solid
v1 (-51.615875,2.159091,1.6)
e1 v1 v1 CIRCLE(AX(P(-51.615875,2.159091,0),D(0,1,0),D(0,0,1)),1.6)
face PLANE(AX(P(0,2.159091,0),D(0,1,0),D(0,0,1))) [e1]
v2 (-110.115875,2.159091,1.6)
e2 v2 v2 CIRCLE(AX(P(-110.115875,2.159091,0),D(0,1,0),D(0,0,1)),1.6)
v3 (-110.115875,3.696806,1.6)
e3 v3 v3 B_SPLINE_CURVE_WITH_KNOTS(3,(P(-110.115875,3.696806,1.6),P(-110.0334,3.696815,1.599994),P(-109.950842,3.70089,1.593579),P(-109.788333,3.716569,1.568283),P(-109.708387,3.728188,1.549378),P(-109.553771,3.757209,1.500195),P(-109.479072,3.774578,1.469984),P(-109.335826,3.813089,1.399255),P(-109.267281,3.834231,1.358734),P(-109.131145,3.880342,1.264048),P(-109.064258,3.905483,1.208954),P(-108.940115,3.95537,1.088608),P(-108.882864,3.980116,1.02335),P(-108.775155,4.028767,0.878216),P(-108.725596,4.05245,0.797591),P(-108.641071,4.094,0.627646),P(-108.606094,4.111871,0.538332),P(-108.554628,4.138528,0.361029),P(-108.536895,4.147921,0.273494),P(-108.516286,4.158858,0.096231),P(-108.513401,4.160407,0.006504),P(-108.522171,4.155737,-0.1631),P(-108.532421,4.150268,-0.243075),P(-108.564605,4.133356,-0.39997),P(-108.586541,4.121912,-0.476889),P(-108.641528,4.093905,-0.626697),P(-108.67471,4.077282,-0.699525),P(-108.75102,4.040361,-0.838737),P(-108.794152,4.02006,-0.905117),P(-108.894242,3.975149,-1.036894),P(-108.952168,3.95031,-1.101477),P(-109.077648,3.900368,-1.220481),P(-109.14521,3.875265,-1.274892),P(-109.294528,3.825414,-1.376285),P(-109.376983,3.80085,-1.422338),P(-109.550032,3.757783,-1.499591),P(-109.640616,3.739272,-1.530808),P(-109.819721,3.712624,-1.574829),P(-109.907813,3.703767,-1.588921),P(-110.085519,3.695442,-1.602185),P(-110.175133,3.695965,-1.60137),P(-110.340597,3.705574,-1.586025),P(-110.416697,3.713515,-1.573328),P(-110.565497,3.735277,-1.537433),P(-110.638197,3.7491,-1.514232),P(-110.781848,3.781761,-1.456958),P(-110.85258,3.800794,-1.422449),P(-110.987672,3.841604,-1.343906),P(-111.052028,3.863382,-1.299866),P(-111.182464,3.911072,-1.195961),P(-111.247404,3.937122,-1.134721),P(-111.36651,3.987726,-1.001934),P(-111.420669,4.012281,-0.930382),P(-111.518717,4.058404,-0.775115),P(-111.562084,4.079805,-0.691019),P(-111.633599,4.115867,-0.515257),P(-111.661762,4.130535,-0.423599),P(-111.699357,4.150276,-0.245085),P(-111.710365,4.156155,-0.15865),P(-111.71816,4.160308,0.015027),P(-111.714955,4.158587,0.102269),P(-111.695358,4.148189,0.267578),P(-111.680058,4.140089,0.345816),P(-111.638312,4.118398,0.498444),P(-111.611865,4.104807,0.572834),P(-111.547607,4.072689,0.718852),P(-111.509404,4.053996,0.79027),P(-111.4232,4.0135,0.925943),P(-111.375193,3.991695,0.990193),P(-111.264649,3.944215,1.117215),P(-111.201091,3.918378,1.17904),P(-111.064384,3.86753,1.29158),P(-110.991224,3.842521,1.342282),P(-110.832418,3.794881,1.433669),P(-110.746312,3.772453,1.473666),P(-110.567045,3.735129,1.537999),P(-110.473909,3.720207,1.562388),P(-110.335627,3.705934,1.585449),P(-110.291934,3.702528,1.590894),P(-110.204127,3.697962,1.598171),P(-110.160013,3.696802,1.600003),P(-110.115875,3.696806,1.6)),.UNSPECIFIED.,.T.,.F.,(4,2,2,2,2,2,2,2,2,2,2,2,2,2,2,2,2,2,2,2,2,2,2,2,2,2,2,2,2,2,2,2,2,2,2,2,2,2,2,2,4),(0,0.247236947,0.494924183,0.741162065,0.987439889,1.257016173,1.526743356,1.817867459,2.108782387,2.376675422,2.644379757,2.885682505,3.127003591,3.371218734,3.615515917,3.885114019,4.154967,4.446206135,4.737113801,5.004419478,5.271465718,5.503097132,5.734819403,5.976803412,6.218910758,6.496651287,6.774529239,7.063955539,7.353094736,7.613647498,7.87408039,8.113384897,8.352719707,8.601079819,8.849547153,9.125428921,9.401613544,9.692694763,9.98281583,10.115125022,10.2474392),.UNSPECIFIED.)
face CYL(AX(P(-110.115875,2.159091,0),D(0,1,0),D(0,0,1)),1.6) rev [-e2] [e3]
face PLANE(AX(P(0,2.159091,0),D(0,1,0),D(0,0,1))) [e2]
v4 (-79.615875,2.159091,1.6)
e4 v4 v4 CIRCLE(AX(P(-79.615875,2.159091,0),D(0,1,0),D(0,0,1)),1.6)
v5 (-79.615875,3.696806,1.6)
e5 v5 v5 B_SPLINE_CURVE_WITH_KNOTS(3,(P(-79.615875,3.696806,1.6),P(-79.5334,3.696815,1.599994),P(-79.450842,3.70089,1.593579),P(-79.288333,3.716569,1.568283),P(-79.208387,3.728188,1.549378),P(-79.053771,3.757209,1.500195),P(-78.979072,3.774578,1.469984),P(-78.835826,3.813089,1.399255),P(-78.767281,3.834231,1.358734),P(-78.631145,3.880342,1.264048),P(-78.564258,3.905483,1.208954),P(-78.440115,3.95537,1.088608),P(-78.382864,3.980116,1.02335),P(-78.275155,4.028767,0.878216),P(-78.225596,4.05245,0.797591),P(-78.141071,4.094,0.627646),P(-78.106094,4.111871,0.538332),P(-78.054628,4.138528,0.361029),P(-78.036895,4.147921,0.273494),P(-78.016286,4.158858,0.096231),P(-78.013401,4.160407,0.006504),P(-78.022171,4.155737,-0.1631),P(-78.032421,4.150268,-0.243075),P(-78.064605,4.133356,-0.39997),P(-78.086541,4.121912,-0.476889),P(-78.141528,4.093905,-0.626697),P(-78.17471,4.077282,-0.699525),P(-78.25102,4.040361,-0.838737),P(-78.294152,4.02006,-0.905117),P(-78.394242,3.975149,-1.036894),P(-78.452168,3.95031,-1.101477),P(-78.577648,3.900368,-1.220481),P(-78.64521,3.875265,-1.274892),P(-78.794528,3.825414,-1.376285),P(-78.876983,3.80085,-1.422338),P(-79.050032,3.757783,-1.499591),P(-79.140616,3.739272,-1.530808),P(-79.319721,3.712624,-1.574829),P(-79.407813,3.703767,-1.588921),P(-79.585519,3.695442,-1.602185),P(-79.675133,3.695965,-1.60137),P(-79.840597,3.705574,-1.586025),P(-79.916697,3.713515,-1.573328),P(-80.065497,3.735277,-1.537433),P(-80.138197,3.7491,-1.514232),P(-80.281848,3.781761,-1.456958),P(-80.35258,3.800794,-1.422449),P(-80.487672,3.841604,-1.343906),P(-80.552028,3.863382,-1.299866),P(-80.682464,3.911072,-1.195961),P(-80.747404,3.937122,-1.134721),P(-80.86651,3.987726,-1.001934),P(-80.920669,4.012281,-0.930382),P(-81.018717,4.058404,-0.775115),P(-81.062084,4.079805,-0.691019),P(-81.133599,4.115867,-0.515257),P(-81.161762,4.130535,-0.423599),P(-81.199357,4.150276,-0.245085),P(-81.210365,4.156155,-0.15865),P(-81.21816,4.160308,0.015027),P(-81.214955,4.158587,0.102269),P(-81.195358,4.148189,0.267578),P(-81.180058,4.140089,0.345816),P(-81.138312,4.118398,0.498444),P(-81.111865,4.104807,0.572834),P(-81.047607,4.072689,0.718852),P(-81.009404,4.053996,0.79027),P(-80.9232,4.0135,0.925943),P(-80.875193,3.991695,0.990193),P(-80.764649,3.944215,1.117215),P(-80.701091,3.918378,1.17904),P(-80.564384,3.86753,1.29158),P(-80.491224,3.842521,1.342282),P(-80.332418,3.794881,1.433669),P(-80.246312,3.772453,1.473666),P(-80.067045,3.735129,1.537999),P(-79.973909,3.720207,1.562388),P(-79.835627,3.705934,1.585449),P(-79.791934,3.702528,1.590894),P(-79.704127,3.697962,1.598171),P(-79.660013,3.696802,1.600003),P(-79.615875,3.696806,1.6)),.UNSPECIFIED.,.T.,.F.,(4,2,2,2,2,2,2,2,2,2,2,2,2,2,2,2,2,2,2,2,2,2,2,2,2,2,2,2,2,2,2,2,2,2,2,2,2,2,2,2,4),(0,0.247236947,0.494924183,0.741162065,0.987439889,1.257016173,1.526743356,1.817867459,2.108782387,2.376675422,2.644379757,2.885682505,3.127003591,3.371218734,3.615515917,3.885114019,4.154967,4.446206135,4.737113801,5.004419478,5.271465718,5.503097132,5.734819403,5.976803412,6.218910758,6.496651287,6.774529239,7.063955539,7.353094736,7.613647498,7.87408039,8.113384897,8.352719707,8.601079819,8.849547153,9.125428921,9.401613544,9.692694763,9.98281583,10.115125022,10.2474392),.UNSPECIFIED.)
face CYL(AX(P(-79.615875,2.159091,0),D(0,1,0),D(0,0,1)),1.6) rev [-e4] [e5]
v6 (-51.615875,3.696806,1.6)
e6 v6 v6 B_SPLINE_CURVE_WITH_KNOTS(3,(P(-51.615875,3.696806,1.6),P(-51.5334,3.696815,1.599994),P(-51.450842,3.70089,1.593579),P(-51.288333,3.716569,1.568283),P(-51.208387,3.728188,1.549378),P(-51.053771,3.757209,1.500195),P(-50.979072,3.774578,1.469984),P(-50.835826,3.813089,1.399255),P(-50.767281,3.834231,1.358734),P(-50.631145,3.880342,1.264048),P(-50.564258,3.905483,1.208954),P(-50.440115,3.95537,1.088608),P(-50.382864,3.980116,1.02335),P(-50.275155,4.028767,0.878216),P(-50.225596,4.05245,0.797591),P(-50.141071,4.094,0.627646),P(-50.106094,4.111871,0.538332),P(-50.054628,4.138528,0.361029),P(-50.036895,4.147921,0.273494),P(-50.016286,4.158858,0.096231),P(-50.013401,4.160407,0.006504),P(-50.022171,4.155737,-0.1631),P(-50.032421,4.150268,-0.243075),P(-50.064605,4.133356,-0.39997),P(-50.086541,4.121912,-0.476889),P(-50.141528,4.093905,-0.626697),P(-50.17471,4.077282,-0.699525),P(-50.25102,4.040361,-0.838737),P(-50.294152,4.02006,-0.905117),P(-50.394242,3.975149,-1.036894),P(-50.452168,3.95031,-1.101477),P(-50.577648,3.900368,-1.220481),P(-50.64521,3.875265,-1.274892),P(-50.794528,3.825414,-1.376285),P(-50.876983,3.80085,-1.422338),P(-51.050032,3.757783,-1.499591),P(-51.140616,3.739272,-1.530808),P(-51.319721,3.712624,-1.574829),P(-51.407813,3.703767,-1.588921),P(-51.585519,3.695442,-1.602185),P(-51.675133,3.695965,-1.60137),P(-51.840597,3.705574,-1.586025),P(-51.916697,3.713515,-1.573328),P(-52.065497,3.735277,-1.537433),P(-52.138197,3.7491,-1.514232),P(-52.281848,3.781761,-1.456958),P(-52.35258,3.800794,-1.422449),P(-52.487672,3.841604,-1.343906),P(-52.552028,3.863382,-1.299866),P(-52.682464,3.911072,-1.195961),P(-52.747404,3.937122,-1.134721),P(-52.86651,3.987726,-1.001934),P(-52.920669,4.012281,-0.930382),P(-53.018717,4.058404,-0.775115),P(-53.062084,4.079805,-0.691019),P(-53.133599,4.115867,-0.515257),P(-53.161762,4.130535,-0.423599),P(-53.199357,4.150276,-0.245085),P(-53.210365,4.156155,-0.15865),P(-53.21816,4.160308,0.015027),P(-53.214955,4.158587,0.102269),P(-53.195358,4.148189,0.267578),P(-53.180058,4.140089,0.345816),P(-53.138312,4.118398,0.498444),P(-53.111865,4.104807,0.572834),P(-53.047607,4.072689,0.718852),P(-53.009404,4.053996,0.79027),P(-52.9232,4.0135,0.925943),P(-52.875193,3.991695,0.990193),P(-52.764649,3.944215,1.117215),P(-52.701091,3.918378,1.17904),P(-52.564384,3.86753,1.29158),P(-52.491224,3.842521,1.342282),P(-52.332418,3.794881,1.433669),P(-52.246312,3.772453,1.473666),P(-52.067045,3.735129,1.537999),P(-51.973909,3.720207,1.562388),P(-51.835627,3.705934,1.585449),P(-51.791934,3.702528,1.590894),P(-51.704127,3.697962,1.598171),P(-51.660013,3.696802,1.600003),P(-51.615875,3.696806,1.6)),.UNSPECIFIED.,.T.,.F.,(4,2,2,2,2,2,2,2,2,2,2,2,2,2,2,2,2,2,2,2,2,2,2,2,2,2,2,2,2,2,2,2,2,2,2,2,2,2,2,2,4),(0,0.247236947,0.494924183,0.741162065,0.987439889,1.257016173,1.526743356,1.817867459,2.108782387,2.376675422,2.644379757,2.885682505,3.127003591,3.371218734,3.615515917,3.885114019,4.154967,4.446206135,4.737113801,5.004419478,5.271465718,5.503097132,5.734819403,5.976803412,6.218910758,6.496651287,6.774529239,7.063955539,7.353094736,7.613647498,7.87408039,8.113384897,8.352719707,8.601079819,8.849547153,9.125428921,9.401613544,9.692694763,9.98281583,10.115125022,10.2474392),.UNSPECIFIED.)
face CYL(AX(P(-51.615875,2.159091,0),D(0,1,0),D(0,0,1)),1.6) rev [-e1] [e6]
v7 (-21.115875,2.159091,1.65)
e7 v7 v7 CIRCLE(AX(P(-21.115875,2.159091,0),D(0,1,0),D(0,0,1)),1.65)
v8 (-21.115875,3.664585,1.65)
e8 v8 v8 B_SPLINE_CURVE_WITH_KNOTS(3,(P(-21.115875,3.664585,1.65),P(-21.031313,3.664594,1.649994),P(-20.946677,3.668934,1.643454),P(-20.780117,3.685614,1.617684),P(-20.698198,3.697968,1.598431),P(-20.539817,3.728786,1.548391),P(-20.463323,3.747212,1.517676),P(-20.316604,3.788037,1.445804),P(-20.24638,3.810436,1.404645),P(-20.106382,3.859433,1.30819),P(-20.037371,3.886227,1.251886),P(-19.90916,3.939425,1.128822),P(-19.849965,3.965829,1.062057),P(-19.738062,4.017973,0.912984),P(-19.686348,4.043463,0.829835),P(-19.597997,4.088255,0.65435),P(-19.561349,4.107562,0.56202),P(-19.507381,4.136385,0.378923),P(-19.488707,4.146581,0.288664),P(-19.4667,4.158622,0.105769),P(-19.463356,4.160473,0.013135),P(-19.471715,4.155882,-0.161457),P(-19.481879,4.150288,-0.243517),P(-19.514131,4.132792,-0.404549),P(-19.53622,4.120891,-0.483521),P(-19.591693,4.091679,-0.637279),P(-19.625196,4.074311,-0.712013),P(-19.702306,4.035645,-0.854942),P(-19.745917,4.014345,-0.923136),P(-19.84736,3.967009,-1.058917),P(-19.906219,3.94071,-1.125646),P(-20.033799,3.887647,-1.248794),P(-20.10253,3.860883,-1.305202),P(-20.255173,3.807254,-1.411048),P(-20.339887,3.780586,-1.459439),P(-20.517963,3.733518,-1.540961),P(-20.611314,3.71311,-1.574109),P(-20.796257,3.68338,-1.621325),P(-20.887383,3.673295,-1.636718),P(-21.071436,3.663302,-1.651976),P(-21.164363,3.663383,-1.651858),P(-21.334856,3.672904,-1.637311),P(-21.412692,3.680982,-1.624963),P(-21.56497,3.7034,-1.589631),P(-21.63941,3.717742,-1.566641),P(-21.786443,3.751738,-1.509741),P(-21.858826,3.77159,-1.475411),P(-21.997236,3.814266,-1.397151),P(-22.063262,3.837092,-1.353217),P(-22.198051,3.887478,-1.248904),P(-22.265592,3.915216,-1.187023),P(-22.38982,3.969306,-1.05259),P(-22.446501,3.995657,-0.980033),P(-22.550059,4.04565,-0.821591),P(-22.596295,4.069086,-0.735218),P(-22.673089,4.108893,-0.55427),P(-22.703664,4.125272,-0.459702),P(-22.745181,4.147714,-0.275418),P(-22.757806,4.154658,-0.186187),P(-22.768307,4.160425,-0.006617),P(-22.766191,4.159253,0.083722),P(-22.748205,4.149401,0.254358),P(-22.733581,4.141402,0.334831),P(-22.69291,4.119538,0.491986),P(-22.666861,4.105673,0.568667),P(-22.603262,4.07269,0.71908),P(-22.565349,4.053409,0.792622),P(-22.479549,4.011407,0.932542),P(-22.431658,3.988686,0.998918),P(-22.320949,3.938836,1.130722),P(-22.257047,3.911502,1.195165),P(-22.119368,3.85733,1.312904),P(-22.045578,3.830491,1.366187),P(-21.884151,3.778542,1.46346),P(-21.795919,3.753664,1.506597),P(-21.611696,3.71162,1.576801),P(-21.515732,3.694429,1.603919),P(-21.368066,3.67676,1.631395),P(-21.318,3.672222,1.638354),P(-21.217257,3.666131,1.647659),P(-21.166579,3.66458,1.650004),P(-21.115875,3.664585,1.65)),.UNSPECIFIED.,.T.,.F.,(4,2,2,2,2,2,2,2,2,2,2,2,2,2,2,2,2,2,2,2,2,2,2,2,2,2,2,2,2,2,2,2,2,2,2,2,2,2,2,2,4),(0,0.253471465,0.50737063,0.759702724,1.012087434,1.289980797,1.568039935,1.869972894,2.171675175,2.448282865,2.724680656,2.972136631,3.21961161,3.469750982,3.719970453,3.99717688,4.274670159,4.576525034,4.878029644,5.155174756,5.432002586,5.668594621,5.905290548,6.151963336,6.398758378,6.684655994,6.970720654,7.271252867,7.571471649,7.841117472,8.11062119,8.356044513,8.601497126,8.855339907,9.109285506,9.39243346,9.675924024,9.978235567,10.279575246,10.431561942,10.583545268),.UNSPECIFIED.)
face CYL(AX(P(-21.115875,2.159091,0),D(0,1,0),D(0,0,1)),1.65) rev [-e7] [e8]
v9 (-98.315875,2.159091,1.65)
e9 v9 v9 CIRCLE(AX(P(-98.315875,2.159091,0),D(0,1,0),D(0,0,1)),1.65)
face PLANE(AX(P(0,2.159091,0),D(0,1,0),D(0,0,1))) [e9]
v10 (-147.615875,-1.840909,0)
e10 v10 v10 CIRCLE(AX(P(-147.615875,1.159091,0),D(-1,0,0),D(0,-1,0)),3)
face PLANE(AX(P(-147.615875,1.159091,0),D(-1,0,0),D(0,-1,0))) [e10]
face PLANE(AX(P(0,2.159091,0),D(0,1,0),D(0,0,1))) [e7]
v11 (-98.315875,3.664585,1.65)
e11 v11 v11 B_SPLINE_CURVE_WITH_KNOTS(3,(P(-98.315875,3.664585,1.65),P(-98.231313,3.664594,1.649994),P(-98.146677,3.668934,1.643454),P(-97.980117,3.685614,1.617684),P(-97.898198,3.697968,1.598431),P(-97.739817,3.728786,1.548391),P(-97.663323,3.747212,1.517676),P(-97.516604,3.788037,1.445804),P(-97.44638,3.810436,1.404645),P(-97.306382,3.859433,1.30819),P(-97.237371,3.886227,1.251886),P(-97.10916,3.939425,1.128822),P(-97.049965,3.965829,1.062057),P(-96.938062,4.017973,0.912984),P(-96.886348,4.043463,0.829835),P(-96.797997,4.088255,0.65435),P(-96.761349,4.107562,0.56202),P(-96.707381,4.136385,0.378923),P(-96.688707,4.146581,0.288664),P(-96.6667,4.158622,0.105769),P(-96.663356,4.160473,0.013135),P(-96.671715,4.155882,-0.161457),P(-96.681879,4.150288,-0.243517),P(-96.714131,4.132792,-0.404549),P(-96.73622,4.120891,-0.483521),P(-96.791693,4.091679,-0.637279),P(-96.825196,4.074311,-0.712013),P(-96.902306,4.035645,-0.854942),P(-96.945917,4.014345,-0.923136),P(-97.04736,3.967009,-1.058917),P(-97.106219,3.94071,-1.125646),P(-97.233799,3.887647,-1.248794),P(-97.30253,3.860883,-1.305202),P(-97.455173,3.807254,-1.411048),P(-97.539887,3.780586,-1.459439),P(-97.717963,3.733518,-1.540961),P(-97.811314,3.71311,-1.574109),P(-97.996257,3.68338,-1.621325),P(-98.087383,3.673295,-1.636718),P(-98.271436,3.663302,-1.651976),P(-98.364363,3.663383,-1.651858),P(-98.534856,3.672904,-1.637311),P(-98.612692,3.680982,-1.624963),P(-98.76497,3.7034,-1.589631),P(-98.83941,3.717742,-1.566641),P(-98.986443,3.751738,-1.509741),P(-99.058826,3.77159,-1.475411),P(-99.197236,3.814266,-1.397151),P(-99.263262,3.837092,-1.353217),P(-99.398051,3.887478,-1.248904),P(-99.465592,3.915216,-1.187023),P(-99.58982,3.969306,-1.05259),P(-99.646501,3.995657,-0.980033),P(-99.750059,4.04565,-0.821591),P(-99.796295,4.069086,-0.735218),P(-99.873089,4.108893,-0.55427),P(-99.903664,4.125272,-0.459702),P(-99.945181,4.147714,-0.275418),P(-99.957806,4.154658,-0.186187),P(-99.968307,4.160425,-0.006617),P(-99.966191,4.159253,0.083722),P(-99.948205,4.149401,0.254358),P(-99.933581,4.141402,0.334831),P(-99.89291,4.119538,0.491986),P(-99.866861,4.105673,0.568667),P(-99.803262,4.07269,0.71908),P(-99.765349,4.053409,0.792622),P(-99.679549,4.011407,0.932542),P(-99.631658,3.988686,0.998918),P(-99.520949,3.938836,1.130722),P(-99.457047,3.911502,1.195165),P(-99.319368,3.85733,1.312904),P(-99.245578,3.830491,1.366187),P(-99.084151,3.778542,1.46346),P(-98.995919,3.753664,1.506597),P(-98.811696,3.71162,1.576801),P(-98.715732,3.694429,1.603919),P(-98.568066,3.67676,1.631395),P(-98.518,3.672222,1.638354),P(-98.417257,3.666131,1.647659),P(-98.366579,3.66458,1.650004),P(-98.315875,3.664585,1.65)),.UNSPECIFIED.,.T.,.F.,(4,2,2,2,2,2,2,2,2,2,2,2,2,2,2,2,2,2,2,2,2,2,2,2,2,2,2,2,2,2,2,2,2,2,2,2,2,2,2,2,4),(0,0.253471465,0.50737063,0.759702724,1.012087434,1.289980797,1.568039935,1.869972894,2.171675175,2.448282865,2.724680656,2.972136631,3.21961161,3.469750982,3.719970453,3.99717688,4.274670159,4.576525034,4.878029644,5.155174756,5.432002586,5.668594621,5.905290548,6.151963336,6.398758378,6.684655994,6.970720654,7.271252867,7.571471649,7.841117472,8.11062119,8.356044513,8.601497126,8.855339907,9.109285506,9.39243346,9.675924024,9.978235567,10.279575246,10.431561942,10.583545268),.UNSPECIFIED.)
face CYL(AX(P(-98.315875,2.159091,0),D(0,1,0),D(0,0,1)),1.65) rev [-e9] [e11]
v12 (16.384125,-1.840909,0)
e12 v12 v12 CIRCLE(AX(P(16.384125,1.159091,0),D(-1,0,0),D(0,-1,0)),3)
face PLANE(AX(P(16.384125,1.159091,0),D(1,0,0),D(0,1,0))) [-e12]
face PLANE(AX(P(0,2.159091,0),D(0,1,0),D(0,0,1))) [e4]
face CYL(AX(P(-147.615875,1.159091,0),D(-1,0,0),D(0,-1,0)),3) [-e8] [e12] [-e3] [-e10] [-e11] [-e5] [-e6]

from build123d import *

# Parameters (mm, degrees)
SKETCH1_W          = 164
SKETCH1_H          = 3
SKETCH3_R          = 1.6
SKETCH3_R_2        = 1.65
CUT_EXTRUDE3_DEPTH = 2


with BuildPart() as part:
    # Sketch1 → Revolve1 (revolve)
    with BuildSketch(Plane.XY):
        with Locations((-65.615874943, -0.340909091)):
            Rectangle(SKETCH1_W, SKETCH1_H)
    revolve(axis=Axis((-147.615874943, 1.159090909, 0), (1, 0, 0)))

    # Sketch3 → Cut-Extrude3 (cut)
    with BuildSketch(Plane(origin=(16.384125057, 4.159090909, 0), x_dir=(1, 0, 0), z_dir=(0, 1, 0))):
        with Locations((-126.5, 0)):
            Circle(SKETCH3_R)
        with Locations((-114.7, 0)):
            Circle(SKETCH3_R_2)
        with Locations((-37.5, 0)):
            Circle(SKETCH3_R_2)
        with Locations((-96, 0)):
            Circle(SKETCH3_R)
        with Locations((-68, 0)):
            Circle(SKETCH3_R)
    extrude(amount=-CUT_EXTRUDE3_DEPTH, mode=Mode.SUBTRACT)


solid = part.part
